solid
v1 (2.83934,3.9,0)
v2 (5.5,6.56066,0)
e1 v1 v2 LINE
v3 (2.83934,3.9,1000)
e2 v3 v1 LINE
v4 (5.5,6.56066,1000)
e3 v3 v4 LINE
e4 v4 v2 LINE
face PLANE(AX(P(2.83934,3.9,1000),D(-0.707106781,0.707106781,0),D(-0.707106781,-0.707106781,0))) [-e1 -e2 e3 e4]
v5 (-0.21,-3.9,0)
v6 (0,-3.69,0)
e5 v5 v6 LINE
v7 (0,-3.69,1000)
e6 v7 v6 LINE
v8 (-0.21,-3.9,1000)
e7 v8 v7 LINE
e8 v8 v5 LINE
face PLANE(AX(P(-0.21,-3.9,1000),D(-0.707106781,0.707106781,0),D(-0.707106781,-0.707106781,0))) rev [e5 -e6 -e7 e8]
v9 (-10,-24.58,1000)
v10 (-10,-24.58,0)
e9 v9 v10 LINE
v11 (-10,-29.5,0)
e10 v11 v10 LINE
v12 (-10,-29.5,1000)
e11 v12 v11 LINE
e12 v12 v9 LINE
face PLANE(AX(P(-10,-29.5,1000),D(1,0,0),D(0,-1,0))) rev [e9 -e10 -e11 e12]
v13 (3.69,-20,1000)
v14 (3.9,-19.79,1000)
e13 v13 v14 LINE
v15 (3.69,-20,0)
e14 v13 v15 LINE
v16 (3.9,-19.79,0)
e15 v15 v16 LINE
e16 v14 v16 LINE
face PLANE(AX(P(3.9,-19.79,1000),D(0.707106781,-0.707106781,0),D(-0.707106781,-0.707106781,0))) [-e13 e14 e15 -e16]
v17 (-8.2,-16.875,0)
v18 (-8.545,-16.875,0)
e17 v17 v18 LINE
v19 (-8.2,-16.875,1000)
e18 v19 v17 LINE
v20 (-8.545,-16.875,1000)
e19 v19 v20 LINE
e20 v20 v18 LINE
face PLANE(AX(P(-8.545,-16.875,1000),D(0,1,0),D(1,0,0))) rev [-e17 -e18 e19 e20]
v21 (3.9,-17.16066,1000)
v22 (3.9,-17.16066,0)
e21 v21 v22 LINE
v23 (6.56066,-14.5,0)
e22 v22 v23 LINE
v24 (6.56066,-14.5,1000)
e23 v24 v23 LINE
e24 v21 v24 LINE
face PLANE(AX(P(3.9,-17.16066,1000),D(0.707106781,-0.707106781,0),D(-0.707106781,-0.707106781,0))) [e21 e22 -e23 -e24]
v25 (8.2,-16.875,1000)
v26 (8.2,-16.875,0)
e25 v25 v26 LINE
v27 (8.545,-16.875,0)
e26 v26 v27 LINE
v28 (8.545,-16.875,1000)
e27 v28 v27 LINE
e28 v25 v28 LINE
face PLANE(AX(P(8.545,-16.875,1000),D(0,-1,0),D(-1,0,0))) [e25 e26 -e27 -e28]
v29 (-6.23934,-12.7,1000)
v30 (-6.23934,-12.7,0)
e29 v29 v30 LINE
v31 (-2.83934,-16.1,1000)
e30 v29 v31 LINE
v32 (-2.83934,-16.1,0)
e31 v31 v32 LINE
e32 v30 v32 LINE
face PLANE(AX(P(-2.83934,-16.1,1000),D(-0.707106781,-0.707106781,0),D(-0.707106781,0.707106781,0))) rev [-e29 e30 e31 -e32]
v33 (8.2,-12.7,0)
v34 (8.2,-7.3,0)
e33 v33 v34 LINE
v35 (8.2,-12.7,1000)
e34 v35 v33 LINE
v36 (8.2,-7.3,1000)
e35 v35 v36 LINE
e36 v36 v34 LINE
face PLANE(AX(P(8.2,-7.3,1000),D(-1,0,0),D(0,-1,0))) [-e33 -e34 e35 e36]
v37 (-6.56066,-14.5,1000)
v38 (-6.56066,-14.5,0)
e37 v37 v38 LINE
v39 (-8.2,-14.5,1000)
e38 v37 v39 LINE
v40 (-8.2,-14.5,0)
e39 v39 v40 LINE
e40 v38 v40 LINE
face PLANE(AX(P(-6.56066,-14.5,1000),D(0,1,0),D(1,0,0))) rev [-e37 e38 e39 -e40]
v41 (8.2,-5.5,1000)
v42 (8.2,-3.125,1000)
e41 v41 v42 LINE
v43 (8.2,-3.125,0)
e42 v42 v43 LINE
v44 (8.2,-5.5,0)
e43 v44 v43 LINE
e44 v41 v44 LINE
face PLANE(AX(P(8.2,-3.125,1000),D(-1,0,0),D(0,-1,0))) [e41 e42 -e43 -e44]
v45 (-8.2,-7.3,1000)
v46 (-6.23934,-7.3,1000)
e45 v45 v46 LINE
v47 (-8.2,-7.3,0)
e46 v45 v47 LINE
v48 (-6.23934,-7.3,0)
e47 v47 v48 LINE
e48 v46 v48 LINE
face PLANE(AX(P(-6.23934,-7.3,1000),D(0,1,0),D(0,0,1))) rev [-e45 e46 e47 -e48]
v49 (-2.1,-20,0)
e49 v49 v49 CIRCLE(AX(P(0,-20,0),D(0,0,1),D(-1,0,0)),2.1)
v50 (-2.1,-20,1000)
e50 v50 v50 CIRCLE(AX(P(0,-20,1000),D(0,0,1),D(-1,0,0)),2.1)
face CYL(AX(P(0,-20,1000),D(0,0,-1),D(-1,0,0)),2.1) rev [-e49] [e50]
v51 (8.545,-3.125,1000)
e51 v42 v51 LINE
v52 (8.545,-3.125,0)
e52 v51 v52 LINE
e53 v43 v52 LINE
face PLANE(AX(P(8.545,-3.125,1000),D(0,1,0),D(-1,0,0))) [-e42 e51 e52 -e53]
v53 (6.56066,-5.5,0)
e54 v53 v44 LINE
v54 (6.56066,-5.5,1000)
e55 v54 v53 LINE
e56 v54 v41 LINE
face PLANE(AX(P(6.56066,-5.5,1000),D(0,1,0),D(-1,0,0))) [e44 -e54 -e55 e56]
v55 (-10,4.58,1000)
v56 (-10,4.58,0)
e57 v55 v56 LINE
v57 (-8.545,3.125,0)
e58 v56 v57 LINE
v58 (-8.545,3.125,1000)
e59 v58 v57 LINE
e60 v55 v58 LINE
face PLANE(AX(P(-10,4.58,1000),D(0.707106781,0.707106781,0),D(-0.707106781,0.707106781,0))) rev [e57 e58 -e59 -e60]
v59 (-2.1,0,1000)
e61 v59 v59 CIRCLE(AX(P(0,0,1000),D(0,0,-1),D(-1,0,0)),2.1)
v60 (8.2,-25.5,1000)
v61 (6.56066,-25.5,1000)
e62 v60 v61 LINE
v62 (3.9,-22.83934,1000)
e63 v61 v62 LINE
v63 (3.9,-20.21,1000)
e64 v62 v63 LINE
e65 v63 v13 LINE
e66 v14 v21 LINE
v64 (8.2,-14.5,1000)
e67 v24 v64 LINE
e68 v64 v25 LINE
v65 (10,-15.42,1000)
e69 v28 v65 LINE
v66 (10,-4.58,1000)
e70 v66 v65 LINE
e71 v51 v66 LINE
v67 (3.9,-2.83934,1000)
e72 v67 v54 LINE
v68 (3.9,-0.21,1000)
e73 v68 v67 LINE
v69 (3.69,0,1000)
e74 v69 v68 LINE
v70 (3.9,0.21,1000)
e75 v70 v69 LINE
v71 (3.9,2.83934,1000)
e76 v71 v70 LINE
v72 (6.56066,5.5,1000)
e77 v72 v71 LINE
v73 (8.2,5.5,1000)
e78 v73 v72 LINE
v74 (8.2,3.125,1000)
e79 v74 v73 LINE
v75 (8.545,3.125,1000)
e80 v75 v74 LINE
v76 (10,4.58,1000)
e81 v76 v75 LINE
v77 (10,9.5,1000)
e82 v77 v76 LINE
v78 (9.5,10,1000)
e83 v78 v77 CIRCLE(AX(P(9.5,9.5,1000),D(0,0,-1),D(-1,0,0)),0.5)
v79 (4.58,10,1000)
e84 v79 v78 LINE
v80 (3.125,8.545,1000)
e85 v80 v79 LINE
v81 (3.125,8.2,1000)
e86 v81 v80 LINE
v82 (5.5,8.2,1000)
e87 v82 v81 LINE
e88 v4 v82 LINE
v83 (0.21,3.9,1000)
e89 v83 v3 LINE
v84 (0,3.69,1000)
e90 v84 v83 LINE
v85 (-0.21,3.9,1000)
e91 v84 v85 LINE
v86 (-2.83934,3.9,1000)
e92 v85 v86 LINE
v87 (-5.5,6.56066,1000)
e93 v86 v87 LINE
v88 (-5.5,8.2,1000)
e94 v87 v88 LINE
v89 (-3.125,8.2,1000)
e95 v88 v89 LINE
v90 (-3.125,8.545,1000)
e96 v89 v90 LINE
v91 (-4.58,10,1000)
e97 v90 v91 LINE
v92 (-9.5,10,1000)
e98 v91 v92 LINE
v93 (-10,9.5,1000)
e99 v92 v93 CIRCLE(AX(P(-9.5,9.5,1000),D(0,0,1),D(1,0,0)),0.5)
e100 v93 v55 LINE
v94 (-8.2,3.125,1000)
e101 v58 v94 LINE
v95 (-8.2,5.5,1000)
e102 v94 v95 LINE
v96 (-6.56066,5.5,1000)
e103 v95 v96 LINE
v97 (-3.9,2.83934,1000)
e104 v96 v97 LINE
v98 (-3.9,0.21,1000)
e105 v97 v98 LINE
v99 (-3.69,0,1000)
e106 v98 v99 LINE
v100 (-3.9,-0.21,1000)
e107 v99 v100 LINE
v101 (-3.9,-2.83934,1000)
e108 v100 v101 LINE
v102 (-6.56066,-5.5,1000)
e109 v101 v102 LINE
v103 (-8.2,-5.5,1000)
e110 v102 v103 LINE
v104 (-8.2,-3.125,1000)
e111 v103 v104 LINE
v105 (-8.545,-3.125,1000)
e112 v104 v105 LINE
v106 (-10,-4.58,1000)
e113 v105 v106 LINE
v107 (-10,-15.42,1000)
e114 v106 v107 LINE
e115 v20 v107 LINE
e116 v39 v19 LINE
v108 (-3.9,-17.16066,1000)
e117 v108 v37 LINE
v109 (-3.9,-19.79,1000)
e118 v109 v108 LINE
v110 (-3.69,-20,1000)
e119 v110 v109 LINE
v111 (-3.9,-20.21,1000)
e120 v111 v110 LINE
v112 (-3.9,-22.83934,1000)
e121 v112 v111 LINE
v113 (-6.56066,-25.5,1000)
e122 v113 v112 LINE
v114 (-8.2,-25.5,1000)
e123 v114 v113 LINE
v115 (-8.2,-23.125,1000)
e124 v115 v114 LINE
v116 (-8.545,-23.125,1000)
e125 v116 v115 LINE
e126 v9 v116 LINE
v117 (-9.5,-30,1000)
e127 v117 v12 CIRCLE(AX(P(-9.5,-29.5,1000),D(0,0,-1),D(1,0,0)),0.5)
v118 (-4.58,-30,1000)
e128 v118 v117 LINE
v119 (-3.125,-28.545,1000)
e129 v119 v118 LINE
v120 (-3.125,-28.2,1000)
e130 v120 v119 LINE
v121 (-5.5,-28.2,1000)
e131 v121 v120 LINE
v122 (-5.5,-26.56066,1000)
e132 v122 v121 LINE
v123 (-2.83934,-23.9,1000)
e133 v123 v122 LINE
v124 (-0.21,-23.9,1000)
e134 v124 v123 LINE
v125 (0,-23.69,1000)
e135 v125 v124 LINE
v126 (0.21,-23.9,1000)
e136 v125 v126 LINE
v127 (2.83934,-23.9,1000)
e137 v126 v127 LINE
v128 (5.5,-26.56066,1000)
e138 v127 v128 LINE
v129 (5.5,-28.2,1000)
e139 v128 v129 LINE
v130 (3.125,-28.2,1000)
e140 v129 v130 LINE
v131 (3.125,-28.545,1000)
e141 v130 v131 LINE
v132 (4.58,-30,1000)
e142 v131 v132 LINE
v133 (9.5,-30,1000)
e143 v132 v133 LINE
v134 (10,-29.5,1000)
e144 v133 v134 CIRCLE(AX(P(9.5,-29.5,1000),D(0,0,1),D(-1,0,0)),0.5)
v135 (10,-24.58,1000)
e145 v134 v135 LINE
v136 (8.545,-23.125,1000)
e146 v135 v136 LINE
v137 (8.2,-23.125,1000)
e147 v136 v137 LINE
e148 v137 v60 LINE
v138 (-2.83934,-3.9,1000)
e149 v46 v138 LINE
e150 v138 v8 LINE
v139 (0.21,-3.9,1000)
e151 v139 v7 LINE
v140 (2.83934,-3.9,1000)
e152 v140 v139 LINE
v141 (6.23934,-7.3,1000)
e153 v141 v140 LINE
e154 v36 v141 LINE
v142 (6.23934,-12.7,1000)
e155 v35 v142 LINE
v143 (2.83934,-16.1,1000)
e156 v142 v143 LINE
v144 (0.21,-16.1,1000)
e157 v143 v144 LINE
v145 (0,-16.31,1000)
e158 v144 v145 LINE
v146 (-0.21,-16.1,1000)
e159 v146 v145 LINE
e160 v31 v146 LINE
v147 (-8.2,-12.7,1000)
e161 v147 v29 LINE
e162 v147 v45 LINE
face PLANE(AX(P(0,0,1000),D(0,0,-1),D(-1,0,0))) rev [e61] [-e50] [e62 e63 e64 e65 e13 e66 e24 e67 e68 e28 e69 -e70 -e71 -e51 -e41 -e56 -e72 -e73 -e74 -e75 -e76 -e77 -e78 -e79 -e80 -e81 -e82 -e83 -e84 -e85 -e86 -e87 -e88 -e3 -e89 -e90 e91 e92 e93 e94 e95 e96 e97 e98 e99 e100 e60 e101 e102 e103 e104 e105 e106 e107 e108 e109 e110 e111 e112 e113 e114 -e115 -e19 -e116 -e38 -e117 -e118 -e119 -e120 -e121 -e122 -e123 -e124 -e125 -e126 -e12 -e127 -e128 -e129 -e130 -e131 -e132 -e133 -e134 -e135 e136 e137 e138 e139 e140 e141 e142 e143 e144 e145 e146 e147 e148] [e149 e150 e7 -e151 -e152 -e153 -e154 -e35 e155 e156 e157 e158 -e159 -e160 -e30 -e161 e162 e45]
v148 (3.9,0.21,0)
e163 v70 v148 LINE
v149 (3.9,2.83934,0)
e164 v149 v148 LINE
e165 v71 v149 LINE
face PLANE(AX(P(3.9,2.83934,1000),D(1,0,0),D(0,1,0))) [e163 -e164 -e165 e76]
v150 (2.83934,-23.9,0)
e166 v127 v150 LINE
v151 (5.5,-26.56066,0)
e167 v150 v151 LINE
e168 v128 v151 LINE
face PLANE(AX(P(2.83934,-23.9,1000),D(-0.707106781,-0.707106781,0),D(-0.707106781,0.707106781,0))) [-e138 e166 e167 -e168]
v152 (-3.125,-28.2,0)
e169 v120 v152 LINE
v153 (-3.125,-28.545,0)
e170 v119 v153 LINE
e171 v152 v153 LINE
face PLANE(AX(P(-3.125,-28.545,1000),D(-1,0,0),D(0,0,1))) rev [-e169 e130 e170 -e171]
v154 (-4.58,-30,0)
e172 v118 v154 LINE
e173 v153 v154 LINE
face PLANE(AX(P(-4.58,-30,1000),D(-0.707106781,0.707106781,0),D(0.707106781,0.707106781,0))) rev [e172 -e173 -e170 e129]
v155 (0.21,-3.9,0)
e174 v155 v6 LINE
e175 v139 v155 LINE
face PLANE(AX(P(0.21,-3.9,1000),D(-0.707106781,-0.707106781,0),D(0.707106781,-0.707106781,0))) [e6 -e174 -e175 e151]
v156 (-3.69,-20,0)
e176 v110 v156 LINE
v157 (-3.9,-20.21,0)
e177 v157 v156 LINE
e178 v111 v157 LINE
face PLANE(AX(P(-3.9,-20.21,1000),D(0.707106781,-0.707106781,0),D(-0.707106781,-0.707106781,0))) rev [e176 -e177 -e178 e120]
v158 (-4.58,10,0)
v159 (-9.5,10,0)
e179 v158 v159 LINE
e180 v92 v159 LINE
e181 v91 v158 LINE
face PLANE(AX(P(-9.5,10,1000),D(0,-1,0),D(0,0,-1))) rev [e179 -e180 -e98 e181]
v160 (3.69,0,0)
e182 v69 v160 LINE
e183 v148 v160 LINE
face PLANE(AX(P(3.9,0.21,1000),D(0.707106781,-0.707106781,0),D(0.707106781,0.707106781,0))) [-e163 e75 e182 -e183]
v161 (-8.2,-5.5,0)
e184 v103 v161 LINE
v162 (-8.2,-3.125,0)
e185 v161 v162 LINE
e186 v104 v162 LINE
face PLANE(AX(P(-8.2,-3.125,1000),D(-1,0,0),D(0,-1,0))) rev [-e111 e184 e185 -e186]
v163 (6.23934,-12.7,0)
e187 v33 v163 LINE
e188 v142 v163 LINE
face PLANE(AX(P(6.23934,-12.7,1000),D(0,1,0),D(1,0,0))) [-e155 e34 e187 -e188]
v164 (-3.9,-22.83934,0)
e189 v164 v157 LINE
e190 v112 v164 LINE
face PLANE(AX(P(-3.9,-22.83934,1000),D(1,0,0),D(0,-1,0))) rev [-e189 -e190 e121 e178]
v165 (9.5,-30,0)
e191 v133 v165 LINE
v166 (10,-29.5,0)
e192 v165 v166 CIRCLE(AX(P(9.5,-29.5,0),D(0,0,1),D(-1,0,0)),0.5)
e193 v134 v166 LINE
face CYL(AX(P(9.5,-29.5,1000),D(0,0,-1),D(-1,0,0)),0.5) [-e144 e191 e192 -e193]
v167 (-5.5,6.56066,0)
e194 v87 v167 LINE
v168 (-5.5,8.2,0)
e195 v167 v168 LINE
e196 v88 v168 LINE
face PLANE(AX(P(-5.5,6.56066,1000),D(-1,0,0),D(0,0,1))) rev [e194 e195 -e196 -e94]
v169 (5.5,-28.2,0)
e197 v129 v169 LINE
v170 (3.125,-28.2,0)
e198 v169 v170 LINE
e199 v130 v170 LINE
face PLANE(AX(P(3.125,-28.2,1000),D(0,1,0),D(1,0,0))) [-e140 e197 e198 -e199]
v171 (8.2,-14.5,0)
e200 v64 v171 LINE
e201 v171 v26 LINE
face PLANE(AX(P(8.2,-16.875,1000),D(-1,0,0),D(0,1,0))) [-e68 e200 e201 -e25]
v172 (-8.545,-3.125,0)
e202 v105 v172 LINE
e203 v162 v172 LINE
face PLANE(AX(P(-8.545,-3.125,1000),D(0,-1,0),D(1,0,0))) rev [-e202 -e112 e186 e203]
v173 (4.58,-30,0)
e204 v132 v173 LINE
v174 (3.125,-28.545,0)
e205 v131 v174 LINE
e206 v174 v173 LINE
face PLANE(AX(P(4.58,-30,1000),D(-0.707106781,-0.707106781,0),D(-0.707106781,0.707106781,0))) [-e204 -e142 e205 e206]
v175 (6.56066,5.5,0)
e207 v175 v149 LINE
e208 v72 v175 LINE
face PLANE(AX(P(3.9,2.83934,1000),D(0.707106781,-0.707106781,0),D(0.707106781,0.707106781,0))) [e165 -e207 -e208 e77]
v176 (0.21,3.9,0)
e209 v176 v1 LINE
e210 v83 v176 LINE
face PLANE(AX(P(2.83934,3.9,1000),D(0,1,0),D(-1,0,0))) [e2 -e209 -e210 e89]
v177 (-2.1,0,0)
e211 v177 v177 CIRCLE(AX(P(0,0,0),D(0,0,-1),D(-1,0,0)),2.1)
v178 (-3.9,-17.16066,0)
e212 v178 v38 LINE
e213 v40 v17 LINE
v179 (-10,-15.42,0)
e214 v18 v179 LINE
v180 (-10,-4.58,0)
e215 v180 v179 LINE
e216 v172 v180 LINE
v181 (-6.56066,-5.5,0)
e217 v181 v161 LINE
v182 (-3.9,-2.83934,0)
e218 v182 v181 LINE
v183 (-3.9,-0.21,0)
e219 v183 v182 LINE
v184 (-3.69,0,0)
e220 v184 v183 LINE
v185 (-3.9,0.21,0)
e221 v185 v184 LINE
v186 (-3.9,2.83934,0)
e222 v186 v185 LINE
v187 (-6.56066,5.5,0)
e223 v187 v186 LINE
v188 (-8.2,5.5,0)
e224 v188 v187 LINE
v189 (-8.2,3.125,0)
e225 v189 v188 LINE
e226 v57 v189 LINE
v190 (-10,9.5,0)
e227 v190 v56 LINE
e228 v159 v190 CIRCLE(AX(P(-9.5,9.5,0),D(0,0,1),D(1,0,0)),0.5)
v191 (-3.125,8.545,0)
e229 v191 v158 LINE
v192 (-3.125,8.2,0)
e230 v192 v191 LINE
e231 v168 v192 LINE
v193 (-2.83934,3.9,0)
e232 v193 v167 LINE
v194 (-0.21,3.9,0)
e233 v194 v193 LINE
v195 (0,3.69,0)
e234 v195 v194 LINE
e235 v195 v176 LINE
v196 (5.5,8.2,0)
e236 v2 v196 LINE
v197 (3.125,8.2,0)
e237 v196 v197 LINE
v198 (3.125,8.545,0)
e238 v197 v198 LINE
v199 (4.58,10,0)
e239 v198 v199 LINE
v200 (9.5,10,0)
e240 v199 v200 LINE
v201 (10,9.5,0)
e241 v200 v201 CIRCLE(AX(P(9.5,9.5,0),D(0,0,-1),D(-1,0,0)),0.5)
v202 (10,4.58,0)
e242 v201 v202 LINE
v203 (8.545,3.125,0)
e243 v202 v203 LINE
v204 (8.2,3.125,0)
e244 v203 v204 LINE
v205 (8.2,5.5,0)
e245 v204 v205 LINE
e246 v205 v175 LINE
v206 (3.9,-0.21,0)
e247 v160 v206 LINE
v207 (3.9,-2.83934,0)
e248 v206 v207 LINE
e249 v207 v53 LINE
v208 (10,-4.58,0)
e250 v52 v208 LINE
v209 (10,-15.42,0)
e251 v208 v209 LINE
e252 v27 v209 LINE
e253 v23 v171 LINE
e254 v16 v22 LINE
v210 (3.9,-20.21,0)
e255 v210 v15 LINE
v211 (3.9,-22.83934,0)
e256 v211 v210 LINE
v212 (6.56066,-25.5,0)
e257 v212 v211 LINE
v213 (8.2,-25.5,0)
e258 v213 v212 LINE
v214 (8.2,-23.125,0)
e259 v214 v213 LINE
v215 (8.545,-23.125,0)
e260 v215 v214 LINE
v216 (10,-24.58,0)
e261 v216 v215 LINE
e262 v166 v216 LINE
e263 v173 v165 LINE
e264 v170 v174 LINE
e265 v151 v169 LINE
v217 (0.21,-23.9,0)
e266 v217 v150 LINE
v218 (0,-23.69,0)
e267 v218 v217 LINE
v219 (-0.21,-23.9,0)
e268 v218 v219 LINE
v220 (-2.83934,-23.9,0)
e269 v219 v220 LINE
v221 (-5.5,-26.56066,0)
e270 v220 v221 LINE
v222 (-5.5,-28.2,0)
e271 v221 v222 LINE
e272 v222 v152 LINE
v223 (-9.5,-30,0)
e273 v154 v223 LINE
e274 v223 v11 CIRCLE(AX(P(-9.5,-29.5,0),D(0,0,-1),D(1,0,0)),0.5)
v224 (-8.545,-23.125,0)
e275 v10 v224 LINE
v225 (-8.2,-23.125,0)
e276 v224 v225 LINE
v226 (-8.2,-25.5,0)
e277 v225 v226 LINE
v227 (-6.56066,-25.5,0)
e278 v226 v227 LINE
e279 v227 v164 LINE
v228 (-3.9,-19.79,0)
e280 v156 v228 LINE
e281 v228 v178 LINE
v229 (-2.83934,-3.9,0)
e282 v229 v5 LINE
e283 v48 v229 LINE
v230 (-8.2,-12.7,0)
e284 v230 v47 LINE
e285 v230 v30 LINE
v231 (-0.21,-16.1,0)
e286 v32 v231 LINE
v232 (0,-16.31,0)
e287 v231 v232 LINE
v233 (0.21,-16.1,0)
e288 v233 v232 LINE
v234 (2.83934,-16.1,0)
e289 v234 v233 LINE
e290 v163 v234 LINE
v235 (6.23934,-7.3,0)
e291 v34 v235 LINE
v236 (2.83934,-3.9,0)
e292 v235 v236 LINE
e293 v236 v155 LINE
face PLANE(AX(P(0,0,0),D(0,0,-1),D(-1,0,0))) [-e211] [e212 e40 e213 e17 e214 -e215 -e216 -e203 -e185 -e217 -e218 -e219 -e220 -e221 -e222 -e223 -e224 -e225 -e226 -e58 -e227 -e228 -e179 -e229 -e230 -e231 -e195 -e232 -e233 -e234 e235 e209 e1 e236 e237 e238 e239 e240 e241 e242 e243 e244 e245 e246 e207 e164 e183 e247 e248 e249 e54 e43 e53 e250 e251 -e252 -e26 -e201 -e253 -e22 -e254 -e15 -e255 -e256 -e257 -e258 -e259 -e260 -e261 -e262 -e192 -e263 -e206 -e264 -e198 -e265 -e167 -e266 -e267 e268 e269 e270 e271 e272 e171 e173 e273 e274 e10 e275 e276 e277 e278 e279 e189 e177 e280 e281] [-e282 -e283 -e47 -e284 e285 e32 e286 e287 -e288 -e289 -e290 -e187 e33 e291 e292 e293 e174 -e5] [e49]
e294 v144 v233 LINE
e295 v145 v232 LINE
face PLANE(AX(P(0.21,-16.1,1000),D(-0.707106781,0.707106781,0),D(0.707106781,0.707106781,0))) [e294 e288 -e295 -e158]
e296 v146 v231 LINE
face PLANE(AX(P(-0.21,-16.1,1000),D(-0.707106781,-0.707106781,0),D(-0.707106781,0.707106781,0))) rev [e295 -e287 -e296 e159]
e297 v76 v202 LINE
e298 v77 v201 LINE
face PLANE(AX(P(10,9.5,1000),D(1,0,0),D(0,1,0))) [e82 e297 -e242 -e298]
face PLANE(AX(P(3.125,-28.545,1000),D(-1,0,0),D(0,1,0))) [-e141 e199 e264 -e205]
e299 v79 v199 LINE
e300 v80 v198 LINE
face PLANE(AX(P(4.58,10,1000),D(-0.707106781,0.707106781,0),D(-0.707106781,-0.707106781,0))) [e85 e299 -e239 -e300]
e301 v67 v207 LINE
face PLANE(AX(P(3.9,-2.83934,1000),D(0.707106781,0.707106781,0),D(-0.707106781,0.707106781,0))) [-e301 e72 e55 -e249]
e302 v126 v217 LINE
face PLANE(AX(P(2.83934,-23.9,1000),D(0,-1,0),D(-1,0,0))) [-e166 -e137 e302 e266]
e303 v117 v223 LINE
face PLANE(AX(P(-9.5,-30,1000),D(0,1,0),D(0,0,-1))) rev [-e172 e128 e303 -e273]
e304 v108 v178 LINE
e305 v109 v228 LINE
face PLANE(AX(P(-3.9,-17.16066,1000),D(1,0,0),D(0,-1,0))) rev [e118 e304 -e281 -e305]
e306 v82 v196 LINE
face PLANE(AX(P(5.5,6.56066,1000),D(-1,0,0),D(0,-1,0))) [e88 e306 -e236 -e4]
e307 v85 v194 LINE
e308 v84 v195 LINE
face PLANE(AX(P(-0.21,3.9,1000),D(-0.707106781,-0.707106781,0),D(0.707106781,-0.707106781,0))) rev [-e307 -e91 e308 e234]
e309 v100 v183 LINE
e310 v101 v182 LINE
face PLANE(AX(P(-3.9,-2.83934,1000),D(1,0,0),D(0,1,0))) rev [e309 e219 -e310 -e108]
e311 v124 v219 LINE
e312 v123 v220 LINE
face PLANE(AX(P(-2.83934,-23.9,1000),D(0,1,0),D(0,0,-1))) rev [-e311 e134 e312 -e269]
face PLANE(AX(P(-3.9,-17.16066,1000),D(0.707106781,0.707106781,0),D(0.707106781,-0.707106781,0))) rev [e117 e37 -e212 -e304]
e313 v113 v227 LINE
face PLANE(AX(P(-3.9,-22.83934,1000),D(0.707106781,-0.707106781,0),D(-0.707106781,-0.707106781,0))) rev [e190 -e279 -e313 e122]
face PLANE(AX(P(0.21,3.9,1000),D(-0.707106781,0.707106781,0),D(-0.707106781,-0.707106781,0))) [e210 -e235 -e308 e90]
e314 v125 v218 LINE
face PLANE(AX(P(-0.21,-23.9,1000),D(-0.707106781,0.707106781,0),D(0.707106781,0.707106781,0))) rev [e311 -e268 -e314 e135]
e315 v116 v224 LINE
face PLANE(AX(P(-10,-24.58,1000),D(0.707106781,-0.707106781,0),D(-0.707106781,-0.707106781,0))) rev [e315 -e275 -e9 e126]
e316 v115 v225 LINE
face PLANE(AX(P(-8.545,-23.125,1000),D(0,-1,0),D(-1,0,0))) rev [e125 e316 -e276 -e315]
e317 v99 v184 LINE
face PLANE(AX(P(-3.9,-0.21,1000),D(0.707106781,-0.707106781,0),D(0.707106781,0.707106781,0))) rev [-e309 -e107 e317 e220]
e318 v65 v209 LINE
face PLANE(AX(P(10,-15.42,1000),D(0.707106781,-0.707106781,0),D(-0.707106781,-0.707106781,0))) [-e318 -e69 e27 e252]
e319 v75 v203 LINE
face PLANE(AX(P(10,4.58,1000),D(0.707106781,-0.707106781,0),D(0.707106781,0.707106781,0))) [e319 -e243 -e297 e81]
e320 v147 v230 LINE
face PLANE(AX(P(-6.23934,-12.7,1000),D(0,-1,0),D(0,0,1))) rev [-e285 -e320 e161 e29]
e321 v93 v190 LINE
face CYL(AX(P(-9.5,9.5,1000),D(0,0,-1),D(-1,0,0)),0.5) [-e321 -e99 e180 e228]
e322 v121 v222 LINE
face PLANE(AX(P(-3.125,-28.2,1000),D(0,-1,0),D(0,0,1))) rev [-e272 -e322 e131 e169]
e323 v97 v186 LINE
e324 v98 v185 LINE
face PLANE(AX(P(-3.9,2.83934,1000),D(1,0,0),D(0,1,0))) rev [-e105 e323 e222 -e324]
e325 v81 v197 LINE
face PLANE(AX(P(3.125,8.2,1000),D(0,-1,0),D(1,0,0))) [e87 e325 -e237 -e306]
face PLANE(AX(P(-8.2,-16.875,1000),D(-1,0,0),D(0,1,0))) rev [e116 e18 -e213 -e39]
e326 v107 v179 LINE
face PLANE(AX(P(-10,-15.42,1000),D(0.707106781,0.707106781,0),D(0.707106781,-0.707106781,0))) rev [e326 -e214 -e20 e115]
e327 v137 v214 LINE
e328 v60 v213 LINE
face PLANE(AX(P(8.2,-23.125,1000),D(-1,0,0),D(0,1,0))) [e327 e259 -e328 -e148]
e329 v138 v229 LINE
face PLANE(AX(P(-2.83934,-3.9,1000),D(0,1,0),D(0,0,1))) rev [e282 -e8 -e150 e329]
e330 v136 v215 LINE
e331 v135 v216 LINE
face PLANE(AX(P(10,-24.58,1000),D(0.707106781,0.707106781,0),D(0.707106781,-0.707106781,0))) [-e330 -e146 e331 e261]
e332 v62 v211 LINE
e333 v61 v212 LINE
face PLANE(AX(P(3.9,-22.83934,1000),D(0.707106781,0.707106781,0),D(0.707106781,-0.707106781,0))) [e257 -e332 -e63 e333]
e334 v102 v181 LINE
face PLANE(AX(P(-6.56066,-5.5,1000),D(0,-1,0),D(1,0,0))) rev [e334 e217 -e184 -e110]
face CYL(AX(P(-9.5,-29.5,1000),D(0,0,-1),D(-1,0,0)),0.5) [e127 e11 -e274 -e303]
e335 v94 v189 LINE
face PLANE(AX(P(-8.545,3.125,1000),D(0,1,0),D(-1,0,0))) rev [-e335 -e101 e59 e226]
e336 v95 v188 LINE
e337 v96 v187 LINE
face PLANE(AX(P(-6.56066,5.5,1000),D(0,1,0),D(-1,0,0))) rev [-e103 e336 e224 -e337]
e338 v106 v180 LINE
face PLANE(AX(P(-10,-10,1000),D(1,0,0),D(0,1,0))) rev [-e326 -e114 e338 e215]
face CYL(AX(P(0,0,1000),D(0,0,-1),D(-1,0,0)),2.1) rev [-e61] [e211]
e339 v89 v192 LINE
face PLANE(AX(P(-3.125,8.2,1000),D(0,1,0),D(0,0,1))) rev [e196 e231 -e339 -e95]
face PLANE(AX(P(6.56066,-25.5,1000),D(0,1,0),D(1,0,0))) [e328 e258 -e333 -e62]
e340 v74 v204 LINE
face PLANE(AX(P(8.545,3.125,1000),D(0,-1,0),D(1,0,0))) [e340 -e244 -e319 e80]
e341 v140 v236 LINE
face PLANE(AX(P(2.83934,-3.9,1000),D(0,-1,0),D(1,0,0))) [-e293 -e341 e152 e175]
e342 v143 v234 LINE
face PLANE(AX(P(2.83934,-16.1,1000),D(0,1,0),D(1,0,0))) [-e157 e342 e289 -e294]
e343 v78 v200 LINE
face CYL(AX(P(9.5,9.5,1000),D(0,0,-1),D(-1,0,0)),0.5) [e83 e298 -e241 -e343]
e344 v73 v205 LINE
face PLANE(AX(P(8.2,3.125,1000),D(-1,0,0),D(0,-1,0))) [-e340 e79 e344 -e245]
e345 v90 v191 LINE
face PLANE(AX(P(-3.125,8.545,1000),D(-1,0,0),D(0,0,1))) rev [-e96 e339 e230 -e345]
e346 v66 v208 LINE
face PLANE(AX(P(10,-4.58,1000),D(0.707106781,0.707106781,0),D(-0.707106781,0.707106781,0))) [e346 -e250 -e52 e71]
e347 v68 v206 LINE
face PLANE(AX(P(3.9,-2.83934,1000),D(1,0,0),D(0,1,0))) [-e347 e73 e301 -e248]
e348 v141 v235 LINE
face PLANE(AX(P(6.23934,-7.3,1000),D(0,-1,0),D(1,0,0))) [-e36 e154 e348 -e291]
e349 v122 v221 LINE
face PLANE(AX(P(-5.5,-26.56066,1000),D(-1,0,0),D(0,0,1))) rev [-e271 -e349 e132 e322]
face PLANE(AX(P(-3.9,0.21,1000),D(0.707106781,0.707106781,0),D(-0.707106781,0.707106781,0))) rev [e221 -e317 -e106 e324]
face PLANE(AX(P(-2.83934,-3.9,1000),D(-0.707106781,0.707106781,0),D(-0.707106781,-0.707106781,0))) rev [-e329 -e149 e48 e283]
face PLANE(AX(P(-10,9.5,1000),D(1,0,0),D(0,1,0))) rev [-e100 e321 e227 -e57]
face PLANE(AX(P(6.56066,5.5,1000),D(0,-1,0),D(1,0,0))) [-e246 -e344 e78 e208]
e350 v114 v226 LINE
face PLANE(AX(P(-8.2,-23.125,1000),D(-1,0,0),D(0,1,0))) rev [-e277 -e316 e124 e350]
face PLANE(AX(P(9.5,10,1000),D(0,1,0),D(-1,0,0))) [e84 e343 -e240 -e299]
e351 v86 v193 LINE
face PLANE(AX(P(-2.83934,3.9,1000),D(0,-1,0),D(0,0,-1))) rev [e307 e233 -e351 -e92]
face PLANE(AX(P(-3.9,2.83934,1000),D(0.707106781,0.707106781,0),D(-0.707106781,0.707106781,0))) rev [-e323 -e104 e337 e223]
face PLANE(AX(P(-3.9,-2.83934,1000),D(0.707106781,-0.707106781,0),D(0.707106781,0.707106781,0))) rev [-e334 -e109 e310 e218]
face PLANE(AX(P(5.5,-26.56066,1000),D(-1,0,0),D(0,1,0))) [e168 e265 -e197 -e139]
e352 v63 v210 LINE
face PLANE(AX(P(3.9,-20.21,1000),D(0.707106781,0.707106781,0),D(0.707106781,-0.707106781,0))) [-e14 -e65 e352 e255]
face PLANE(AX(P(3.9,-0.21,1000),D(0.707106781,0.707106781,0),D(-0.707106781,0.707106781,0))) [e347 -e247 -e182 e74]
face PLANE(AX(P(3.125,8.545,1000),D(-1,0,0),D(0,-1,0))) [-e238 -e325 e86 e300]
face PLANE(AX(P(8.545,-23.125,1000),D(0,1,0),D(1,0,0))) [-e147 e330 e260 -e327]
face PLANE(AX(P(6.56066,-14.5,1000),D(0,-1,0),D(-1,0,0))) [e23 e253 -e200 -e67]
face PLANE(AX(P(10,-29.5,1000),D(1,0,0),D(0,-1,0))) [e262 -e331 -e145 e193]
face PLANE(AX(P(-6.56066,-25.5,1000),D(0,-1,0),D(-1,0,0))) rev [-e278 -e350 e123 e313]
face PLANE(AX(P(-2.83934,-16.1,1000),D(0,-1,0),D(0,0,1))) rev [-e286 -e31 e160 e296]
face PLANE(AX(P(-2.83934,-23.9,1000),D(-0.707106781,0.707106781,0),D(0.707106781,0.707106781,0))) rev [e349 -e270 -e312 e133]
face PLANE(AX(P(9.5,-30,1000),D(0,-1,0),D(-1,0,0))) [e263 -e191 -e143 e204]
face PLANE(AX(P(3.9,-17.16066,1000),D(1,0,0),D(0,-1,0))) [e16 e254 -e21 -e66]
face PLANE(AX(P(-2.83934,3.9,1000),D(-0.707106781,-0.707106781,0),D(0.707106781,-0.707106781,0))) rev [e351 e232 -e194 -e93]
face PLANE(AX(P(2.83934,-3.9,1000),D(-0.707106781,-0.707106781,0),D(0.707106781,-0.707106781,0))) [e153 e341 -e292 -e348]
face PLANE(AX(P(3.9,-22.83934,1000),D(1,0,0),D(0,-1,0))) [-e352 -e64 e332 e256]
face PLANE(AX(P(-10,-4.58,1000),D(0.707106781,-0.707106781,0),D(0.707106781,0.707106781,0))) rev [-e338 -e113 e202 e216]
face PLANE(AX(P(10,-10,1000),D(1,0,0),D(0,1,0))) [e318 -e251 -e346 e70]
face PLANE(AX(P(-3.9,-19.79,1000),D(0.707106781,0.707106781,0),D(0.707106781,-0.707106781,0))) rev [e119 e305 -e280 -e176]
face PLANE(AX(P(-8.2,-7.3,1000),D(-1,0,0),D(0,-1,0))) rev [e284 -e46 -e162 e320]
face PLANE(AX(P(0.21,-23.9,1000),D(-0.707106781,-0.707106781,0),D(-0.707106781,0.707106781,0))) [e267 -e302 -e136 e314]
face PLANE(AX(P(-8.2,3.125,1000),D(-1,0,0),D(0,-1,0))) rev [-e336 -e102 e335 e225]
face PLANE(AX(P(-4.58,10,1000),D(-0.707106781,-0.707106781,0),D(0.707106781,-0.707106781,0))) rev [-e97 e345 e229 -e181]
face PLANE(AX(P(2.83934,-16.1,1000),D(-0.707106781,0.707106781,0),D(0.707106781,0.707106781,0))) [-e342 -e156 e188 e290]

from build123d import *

# Parameters (mm, degrees)
BOSS_EXTRU_1_DEPTH  = 1000
SYM_TRIE6_OUTLINE_R = 2.1
SYM_TRIE6_DEPTH     = 1000


# Read off the part's stored shape, not the designer's step: Symétrie6
with BuildPart() as part:
    # Esquisse1 → Boss.-Extru.1 (new body)
    with BuildSketch(Plane.XY):
        with BuildLine():
            Line((-9.5, 10), (-4.58, 10))
            Line((-4.58, 10), (-3.125, 8.545))
            Line((-3.125, 8.545), (-3.125, 8.2))
            Line((-3.125, 8.2), (-5.5, 8.2))
            Line((-5.5, 8.2), (-5.5, 6.560660172))
            Line((-5.5, 6.560660172), (-2.839339828, 3.9))
            Line((-2.839339828, 3.9), (-0.21, 3.9))
            Line((-0.21, 3.9), (0, 3.69))
            Line((0, 3.69), (0, 2.1))
            ThreePointArc((0, 2.1), (-2.1, 0), (0, -2.1))
            Line((0, -2.1), (0, -3.69))
            Line((0, -3.69), (-0.21, -3.9))
            Line((-0.21, -3.9), (-2.839339828, -3.9))
            Line((-2.839339828, -3.9), (-6.239339828, -7.3))
            Line((-6.239339828, -7.3), (-8.2, -7.3))
            Line((-8.2, -7.3), (-8.2, -10))
            Line((-8.2, -10), (-10, -10))
            Line((-10, -10), (-10, -4.58))
            Line((-10, -4.58), (-8.545, -3.125))
            Line((-8.545, -3.125), (-8.2, -3.125))
            Line((-8.2, -3.125), (-8.2, -5.5))
            Line((-8.2, -5.5), (-6.560660172, -5.5))
            Line((-6.560660172, -5.5), (-3.9, -2.839339828))
            Line((-3.9, -2.839339828), (-3.9, -0.21))
            Line((-3.9, -0.21), (-3.69, 0))
            Line((-3.69, 0), (-3.9, 0.21))
            Line((-3.9, 0.21), (-3.9, 2.839339828))
            Line((-3.9, 2.839339828), (-6.560660172, 5.5))
            Line((-6.560660172, 5.5), (-8.2, 5.5))
            Line((-8.2, 5.5), (-8.2, 3.125))
            Line((-8.2, 3.125), (-8.545, 3.125))
            Line((-8.545, 3.125), (-10, 4.58))
            Line((-10, 4.58), (-10, 9.5))
            ThreePointArc((-10, 9.5), (-9.853553391, 9.853553391), (-9.5, 10))
        make_face()
    boss_extru_1 = extrude(amount=BOSS_EXTRU_1_DEPTH)

    # Symétrie1: Boss.-Extru.1 across Right Plane
    add(boss_extru_1.mirror(Plane(origin=(0, 0, 0), x_dir=(0, 0, -1), z_dir=(1, 0, 0))))

    # Symétrie6 outline → Symétrie6 (add)
    with BuildSketch(Plane.XY):
        with BuildLine():
            Line((-3.9, -17.160660172), (-3.9, -19.79))
            Line((-3.9, -19.79), (-3.69, -20))
            Line((-3.69, -20), (-3.9, -20.21))
            Line((-3.9, -20.21), (-3.9, -22.839339828))
            Line((-3.9, -22.839339828), (-6.560660172, -25.5))
            Line((-6.560660172, -25.5), (-8.2, -25.5))
            Line((-8.2, -25.5), (-8.2, -23.125))
            Line((-8.2, -23.125), (-8.545, -23.125))
            Line((-8.545, -23.125), (-10, -24.58))
            Line((-10, -24.58), (-10, -29.5))
            ThreePointArc((-10, -29.5), (-9.853553391, -29.853553391), (-9.5, -30))
            Line((-9.5, -30), (-4.58, -30))
            Line((-4.58, -30), (-3.125, -28.545))
            Line((-3.125, -28.545), (-3.125, -28.2))
            Line((-3.125, -28.2), (-5.5, -28.2))
            Line((-5.5, -28.2), (-5.5, -26.560660172))
            Line((-5.5, -26.560660172), (-2.839339828, -23.9))
            Line((-2.839339828, -23.9), (-0.21, -23.9))
            Line((-0.21, -23.9), (0, -23.69))
            Line((0, -23.69), (0.21, -23.9))
            Line((0.21, -23.9), (2.839339828, -23.9))
            Line((2.839339828, -23.9), (5.5, -26.560660172))
            Line((5.5, -26.560660172), (5.5, -28.2))
            Line((5.5, -28.2), (3.125, -28.2))
            Line((3.125, -28.2), (3.125, -28.545))
            Line((3.125, -28.545), (4.58, -30))
            Line((4.58, -30), (9.5, -30))
            ThreePointArc((9.5, -30), (9.853553391, -29.853553391), (10, -29.5))
            Line((10, -29.5), (10, -24.58))
            Line((10, -24.58), (8.545, -23.125))
            Line((8.545, -23.125), (8.2, -23.125))
            Line((8.2, -23.125), (8.2, -25.5))
            Line((8.2, -25.5), (6.560660172, -25.5))
            Line((6.560660172, -25.5), (3.9, -22.839339828))
            Line((3.9, -22.839339828), (3.9, -20.21))
            Line((3.9, -20.21), (3.69, -20))
            Line((3.69, -20), (3.9, -19.79))
            Line((3.9, -19.79), (3.9, -17.160660172))
            Line((3.9, -17.160660172), (6.560660172, -14.5))
            Line((6.560660172, -14.5), (8.2, -14.5))
            Line((8.2, -14.5), (8.2, -16.875))
            Line((8.2, -16.875), (8.545, -16.875))
            Line((8.545, -16.875), (10, -15.42))
            Line((10, -15.42), (10, -10))
            Line((10, -10), (8.2, -10))
            Line((8.2, -10), (8.2, -12.7))
            Line((8.2, -12.7), (6.239339828, -12.7))
            Line((6.239339828, -12.7), (2.839339828, -16.1))
            Line((2.839339828, -16.1), (0.21, -16.1))
            Line((0.21, -16.1), (0, -16.31))
            Line((0, -16.31), (-0.21, -16.1))
            Line((-0.21, -16.1), (-2.839339828, -16.1))
            Line((-2.839339828, -16.1), (-6.239339828, -12.7))
            Line((-6.239339828, -12.7), (-8.2, -12.7))
            Line((-8.2, -12.7), (-8.2, -10))
            Line((-8.2, -10), (-10, -10))
            Line((-10, -10), (-10, -15.42))
            Line((-10, -15.42), (-8.545, -16.875))
            Line((-8.545, -16.875), (-8.2, -16.875))
            Line((-8.2, -16.875), (-8.2, -14.5))
            Line((-8.2, -14.5), (-6.560660172, -14.5))
            Line((-6.560660172, -14.5), (-3.9, -17.160660172))
        make_face()
        with Locations((0, -20)):
            Circle(SYM_TRIE6_OUTLINE_R, mode=Mode.SUBTRACT)
    extrude(amount=SYM_TRIE6_DEPTH)


solid = part.part
